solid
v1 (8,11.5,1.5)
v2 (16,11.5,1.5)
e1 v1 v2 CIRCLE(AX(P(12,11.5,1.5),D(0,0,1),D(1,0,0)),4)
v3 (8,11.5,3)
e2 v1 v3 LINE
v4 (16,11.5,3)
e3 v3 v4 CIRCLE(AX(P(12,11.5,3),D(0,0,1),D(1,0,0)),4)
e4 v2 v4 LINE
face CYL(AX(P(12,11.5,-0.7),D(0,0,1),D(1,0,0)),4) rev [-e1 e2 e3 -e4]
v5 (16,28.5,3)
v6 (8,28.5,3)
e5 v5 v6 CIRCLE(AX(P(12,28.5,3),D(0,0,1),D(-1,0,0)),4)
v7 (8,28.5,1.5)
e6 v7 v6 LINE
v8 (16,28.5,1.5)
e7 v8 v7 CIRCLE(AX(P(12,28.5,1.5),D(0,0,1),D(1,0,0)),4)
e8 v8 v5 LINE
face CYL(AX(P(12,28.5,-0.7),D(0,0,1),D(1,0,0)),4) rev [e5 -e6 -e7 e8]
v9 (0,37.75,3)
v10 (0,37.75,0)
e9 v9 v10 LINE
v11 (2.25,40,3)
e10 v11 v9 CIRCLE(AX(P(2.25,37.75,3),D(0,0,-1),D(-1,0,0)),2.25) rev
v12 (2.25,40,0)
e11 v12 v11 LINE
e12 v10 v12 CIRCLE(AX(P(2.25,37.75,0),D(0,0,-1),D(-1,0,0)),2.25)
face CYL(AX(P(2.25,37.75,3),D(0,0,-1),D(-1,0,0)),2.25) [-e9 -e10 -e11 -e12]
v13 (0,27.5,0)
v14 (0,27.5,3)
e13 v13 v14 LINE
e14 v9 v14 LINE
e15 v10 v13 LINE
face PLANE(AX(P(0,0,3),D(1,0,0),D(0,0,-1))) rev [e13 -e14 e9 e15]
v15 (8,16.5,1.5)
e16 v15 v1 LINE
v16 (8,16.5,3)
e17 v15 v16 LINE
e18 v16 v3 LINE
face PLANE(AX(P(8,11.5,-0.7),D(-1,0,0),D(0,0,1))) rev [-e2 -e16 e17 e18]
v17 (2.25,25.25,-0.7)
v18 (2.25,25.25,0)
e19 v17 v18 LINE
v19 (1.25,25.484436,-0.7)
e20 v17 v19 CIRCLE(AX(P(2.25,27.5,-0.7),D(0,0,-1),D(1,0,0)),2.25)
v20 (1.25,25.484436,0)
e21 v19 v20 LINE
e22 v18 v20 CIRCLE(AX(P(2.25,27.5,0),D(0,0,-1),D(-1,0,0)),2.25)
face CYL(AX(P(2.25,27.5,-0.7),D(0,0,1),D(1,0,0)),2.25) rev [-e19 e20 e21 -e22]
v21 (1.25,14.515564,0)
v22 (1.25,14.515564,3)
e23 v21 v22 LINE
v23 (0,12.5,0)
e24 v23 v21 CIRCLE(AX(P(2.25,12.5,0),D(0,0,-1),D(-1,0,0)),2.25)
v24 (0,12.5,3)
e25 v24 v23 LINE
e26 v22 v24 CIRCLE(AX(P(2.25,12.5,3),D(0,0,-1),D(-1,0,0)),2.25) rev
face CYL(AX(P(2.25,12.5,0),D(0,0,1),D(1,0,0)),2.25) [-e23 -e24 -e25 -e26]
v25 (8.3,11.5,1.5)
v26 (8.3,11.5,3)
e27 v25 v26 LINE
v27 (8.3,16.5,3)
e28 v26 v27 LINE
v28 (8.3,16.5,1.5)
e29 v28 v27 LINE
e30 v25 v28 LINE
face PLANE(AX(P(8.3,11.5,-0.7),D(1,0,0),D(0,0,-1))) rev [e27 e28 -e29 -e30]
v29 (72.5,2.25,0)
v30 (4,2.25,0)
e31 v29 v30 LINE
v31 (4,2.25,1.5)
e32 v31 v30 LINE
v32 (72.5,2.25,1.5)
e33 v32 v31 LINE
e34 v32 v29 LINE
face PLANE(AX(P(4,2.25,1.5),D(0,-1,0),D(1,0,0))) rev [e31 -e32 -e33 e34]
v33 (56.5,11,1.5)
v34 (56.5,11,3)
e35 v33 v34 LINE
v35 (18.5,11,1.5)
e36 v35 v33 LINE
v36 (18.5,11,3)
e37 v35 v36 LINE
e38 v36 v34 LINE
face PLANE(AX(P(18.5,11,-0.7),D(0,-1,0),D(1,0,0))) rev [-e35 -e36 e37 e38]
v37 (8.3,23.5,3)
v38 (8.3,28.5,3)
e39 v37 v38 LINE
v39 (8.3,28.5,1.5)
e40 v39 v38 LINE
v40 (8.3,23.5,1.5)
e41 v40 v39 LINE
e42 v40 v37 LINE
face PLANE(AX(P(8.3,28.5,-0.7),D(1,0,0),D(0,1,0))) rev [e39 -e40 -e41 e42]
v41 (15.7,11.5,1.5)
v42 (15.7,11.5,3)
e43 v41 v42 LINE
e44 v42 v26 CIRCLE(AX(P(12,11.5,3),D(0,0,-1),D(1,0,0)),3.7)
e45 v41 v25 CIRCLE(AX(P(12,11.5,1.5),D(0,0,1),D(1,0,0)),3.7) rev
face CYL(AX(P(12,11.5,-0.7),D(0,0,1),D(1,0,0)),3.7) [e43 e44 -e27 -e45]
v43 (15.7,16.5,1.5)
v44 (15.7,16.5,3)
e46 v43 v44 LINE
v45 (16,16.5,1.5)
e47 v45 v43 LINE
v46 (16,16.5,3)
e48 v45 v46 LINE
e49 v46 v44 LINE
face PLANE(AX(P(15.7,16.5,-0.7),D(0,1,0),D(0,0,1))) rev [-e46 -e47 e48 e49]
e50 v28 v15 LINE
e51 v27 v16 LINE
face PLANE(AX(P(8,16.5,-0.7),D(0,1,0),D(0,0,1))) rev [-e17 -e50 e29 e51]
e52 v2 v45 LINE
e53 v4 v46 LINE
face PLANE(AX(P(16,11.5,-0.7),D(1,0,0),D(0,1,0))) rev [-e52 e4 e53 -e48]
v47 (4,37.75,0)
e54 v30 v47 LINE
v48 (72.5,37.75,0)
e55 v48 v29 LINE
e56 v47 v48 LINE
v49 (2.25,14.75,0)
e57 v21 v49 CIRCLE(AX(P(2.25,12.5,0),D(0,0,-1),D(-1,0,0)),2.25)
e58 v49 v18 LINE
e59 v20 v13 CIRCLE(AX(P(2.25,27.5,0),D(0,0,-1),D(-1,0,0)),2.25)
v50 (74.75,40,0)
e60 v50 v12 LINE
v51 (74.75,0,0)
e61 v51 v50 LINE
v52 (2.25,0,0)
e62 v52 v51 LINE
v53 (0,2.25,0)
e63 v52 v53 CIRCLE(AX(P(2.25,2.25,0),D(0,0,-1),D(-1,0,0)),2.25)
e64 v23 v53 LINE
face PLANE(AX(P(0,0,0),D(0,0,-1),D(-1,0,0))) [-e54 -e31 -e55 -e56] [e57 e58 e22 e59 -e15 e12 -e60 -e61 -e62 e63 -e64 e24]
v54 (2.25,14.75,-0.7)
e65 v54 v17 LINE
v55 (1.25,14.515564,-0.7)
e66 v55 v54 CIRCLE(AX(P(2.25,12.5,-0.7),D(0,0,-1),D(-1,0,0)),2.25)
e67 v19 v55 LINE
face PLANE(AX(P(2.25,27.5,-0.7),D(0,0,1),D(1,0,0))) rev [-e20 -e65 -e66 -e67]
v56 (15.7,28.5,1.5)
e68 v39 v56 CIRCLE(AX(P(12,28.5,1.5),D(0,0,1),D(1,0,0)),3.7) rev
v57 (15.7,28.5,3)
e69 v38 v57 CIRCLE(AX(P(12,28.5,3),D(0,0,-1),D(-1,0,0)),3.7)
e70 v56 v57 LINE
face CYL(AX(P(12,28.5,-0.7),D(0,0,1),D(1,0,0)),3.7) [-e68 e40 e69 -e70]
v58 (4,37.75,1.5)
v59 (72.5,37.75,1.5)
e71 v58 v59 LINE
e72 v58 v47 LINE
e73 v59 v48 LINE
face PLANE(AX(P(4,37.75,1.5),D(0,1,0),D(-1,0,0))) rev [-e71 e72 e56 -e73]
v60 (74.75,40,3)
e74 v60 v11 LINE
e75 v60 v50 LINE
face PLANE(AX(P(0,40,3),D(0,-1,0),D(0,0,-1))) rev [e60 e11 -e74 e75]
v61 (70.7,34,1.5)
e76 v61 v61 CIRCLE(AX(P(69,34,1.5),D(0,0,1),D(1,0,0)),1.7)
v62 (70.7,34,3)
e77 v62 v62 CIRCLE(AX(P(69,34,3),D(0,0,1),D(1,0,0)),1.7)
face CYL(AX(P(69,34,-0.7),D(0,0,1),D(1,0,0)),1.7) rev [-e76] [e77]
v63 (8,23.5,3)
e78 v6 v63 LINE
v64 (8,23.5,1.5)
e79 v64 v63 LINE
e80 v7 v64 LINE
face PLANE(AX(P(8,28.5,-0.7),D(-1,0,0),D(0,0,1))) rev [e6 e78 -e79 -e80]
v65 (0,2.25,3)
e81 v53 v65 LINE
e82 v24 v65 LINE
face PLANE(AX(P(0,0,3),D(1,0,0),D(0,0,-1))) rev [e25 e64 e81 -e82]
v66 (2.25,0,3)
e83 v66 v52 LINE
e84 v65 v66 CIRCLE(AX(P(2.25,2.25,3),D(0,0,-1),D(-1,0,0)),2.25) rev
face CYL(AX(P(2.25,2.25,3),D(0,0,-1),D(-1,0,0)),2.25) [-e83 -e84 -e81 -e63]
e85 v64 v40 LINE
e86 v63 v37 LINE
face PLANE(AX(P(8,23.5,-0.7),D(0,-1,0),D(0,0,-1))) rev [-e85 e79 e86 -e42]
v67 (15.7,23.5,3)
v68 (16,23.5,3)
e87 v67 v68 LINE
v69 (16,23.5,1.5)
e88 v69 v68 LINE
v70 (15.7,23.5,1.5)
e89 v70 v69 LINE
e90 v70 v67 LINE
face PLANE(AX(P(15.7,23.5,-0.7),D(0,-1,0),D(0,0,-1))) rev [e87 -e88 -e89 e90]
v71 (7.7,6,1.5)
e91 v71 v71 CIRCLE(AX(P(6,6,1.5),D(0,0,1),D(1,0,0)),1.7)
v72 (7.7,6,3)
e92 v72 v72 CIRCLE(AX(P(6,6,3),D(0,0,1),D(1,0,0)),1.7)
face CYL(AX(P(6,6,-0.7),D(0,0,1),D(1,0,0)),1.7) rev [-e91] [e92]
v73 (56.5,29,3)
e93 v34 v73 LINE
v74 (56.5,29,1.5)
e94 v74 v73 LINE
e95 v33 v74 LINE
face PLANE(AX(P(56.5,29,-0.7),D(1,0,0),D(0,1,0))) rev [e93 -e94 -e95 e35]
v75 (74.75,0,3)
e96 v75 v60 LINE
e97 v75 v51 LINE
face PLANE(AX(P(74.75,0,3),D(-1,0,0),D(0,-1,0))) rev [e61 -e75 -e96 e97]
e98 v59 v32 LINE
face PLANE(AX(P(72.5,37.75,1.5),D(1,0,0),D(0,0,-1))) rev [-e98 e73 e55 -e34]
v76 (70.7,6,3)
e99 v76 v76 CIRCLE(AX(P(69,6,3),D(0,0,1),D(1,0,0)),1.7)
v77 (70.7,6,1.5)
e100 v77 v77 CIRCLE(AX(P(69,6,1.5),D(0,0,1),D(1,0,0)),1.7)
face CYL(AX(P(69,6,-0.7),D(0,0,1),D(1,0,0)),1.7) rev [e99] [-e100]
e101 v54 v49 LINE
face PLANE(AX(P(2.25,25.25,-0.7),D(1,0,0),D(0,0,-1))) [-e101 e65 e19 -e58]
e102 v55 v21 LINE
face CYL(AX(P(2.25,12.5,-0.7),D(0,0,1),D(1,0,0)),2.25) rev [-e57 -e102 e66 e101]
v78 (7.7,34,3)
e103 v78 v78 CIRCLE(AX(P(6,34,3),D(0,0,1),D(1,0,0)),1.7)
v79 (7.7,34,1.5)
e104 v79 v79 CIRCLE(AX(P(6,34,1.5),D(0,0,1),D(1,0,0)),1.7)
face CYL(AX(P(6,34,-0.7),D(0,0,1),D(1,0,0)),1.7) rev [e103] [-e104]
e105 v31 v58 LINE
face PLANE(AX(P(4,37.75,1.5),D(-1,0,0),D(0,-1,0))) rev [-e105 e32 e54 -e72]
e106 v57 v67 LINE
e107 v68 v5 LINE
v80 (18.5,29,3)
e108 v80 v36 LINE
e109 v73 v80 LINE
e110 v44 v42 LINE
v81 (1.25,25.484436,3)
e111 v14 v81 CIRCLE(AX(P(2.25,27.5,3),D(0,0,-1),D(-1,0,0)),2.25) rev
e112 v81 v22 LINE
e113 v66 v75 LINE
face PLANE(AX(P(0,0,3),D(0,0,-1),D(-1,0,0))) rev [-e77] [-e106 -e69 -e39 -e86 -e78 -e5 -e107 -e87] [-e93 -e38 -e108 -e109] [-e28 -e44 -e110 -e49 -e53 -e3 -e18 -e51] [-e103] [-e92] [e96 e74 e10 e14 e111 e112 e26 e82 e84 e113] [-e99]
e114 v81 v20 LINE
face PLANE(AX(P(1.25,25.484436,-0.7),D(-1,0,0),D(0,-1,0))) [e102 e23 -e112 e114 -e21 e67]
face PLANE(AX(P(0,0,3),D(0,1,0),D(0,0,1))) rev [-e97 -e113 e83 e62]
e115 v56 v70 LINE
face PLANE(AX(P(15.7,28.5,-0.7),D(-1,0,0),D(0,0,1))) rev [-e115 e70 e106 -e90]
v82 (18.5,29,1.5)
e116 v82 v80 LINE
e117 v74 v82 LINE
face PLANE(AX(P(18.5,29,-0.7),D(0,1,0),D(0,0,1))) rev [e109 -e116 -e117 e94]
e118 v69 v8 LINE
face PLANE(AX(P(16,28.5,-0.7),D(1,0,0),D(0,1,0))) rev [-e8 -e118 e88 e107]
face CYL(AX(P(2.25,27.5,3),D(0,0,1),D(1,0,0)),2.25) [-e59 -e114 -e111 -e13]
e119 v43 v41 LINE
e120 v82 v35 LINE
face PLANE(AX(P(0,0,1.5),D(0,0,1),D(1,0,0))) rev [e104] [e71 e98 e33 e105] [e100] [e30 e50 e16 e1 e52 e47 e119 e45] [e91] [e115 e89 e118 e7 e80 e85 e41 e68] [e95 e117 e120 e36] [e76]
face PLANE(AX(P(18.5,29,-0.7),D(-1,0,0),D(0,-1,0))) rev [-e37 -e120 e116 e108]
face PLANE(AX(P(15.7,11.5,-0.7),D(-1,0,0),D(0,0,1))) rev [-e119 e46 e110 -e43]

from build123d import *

# Parameters (mm, degrees)
SKETCH1_W           = 74.75
SKETCH1_H           = 40
BOSS_EXTRUDE1_DEPTH = 3
SKETCH2_W           = 2.25
SKETCH2_H           = 10.5
CUT_EXTRUDE1_DEPTH  = 85.832555661
FILLET2_R           = 2.25
FILLET1_R           = 2.25
BOSS_EXTRUDE4_DEPTH = 3.7
SKETCH7_W           = 68.5
SKETCH7_H           = 35.5
OLED_RECESS_DEPTH   = 1.5
SKETCH9_R           = 1.7
SKETCH9_W           = 38
SKETCH9_H           = 18
CUT_EXTRUDE5_DEPTH  = 85.860193848


with BuildPart() as part:
    # Sketch1 → Boss-Extrude1 (new body)
    with BuildSketch(Plane.XY):
        with Locations((37.375, 20)):
            Rectangle(SKETCH1_W, SKETCH1_H)
    extrude(amount=BOSS_EXTRUDE1_DEPTH)

    # Sketch2 → Cut-Extrude1 (cut, through all)
    with BuildSketch(Plane.XY.offset(3)):
        with Locations((1.125, 20)):
            Rectangle(SKETCH2_W, SKETCH2_H)
    extrude(amount=-CUT_EXTRUDE1_DEPTH, mode=Mode.SUBTRACT)

    # Fillet2
    fillet2_edges = [part.edges().sort_by_distance(p)[0] for p in [
        (0, 14.75, 1.5),
        (0, 25.25, 1.5),
    ]]
    fillet(fillet2_edges, radius=FILLET2_R - 0.0001)  # a hair under: the kernel refuses the full size

    # Fillet1
    fillet1_edges = [part.edges().sort_by_distance(p)[0] for p in [
        (0, 40, 1.5),
        (0, 0, 1.5),
    ]]
    fillet(fillet1_edges, radius=FILLET1_R)

    # Sketch6 → Boss-Extrude4 (add)
    with BuildSketch(Plane.XY.offset(3)):
        with BuildLine():
            Line((1.25, 25.484435563), (1.25, 14.515564437))
            ThreePointArc((1.25, 14.515564437), (1.736443763, 14.69060722), (2.25, 14.75))
            Line((2.25, 14.75), (2.25, 25.25))
            ThreePointArc((2.25, 25.25), (1.736443763, 25.30939278), (1.25, 25.484435563))
        make_face()
    extrude(amount=-BOSS_EXTRUDE4_DEPTH)

    # Sketch7 → oled-recess (cut)
    with BuildSketch(Plane(origin=(0, 0, 0), x_dir=(-1, 0, 0), z_dir=(0, 0, -1))):
        with Locations((-38.25, 20)):
            Rectangle(SKETCH7_W, SKETCH7_H)
    extrude(amount=-OLED_RECESS_DEPTH, mode=Mode.SUBTRACT)

    # Sketch9 → Cut-Extrude5 (cut, through all)
    with BuildSketch(Plane.XY.offset(3)):
        with Locations((6, 34)):
            Circle(SKETCH9_R)
        with Locations((69, 34)):
            Circle(SKETCH9_R)
        with Locations((6, 6)):
            Circle(SKETCH9_R)
        with Locations((69, 6)):
            Circle(SKETCH9_R)
        with Locations((37.5, 20)):
            Rectangle(SKETCH9_W, SKETCH9_H)
        with BuildLine():
            Line((8, 28.5), (8, 23.5))
            Line((8, 23.5), (8.3, 23.5))
            Line((8.3, 23.5), (8.3, 28.5))
            ThreePointArc((8.3, 28.5), (12, 32.2), (15.7, 28.5))
            Line((15.7, 28.5), (15.7, 23.5))
            Line((15.7, 23.5), (16, 23.5))
            Line((16, 23.5), (16, 28.5))
            ThreePointArc((16, 28.5), (12, 32.5), (8, 28.5))
        make_face()
        with BuildLine():
            Line((15.7, 16.5), (16, 16.5))
            Line((16, 16.5), (16, 11.5))
            ThreePointArc((16, 11.5), (12, 7.5), (8, 11.5))
            Line((8, 11.5), (8, 16.5))
            Line((8, 16.5), (8.3, 16.5))
            Line((8.3, 16.5), (8.3, 11.5))
            ThreePointArc((8.3, 11.5), (12, 7.8), (15.7, 11.5))
            Line((15.7, 11.5), (15.7, 16.5))
        make_face()
    extrude(amount=-CUT_EXTRUDE5_DEPTH, mode=Mode.SUBTRACT)


solid = part.part
